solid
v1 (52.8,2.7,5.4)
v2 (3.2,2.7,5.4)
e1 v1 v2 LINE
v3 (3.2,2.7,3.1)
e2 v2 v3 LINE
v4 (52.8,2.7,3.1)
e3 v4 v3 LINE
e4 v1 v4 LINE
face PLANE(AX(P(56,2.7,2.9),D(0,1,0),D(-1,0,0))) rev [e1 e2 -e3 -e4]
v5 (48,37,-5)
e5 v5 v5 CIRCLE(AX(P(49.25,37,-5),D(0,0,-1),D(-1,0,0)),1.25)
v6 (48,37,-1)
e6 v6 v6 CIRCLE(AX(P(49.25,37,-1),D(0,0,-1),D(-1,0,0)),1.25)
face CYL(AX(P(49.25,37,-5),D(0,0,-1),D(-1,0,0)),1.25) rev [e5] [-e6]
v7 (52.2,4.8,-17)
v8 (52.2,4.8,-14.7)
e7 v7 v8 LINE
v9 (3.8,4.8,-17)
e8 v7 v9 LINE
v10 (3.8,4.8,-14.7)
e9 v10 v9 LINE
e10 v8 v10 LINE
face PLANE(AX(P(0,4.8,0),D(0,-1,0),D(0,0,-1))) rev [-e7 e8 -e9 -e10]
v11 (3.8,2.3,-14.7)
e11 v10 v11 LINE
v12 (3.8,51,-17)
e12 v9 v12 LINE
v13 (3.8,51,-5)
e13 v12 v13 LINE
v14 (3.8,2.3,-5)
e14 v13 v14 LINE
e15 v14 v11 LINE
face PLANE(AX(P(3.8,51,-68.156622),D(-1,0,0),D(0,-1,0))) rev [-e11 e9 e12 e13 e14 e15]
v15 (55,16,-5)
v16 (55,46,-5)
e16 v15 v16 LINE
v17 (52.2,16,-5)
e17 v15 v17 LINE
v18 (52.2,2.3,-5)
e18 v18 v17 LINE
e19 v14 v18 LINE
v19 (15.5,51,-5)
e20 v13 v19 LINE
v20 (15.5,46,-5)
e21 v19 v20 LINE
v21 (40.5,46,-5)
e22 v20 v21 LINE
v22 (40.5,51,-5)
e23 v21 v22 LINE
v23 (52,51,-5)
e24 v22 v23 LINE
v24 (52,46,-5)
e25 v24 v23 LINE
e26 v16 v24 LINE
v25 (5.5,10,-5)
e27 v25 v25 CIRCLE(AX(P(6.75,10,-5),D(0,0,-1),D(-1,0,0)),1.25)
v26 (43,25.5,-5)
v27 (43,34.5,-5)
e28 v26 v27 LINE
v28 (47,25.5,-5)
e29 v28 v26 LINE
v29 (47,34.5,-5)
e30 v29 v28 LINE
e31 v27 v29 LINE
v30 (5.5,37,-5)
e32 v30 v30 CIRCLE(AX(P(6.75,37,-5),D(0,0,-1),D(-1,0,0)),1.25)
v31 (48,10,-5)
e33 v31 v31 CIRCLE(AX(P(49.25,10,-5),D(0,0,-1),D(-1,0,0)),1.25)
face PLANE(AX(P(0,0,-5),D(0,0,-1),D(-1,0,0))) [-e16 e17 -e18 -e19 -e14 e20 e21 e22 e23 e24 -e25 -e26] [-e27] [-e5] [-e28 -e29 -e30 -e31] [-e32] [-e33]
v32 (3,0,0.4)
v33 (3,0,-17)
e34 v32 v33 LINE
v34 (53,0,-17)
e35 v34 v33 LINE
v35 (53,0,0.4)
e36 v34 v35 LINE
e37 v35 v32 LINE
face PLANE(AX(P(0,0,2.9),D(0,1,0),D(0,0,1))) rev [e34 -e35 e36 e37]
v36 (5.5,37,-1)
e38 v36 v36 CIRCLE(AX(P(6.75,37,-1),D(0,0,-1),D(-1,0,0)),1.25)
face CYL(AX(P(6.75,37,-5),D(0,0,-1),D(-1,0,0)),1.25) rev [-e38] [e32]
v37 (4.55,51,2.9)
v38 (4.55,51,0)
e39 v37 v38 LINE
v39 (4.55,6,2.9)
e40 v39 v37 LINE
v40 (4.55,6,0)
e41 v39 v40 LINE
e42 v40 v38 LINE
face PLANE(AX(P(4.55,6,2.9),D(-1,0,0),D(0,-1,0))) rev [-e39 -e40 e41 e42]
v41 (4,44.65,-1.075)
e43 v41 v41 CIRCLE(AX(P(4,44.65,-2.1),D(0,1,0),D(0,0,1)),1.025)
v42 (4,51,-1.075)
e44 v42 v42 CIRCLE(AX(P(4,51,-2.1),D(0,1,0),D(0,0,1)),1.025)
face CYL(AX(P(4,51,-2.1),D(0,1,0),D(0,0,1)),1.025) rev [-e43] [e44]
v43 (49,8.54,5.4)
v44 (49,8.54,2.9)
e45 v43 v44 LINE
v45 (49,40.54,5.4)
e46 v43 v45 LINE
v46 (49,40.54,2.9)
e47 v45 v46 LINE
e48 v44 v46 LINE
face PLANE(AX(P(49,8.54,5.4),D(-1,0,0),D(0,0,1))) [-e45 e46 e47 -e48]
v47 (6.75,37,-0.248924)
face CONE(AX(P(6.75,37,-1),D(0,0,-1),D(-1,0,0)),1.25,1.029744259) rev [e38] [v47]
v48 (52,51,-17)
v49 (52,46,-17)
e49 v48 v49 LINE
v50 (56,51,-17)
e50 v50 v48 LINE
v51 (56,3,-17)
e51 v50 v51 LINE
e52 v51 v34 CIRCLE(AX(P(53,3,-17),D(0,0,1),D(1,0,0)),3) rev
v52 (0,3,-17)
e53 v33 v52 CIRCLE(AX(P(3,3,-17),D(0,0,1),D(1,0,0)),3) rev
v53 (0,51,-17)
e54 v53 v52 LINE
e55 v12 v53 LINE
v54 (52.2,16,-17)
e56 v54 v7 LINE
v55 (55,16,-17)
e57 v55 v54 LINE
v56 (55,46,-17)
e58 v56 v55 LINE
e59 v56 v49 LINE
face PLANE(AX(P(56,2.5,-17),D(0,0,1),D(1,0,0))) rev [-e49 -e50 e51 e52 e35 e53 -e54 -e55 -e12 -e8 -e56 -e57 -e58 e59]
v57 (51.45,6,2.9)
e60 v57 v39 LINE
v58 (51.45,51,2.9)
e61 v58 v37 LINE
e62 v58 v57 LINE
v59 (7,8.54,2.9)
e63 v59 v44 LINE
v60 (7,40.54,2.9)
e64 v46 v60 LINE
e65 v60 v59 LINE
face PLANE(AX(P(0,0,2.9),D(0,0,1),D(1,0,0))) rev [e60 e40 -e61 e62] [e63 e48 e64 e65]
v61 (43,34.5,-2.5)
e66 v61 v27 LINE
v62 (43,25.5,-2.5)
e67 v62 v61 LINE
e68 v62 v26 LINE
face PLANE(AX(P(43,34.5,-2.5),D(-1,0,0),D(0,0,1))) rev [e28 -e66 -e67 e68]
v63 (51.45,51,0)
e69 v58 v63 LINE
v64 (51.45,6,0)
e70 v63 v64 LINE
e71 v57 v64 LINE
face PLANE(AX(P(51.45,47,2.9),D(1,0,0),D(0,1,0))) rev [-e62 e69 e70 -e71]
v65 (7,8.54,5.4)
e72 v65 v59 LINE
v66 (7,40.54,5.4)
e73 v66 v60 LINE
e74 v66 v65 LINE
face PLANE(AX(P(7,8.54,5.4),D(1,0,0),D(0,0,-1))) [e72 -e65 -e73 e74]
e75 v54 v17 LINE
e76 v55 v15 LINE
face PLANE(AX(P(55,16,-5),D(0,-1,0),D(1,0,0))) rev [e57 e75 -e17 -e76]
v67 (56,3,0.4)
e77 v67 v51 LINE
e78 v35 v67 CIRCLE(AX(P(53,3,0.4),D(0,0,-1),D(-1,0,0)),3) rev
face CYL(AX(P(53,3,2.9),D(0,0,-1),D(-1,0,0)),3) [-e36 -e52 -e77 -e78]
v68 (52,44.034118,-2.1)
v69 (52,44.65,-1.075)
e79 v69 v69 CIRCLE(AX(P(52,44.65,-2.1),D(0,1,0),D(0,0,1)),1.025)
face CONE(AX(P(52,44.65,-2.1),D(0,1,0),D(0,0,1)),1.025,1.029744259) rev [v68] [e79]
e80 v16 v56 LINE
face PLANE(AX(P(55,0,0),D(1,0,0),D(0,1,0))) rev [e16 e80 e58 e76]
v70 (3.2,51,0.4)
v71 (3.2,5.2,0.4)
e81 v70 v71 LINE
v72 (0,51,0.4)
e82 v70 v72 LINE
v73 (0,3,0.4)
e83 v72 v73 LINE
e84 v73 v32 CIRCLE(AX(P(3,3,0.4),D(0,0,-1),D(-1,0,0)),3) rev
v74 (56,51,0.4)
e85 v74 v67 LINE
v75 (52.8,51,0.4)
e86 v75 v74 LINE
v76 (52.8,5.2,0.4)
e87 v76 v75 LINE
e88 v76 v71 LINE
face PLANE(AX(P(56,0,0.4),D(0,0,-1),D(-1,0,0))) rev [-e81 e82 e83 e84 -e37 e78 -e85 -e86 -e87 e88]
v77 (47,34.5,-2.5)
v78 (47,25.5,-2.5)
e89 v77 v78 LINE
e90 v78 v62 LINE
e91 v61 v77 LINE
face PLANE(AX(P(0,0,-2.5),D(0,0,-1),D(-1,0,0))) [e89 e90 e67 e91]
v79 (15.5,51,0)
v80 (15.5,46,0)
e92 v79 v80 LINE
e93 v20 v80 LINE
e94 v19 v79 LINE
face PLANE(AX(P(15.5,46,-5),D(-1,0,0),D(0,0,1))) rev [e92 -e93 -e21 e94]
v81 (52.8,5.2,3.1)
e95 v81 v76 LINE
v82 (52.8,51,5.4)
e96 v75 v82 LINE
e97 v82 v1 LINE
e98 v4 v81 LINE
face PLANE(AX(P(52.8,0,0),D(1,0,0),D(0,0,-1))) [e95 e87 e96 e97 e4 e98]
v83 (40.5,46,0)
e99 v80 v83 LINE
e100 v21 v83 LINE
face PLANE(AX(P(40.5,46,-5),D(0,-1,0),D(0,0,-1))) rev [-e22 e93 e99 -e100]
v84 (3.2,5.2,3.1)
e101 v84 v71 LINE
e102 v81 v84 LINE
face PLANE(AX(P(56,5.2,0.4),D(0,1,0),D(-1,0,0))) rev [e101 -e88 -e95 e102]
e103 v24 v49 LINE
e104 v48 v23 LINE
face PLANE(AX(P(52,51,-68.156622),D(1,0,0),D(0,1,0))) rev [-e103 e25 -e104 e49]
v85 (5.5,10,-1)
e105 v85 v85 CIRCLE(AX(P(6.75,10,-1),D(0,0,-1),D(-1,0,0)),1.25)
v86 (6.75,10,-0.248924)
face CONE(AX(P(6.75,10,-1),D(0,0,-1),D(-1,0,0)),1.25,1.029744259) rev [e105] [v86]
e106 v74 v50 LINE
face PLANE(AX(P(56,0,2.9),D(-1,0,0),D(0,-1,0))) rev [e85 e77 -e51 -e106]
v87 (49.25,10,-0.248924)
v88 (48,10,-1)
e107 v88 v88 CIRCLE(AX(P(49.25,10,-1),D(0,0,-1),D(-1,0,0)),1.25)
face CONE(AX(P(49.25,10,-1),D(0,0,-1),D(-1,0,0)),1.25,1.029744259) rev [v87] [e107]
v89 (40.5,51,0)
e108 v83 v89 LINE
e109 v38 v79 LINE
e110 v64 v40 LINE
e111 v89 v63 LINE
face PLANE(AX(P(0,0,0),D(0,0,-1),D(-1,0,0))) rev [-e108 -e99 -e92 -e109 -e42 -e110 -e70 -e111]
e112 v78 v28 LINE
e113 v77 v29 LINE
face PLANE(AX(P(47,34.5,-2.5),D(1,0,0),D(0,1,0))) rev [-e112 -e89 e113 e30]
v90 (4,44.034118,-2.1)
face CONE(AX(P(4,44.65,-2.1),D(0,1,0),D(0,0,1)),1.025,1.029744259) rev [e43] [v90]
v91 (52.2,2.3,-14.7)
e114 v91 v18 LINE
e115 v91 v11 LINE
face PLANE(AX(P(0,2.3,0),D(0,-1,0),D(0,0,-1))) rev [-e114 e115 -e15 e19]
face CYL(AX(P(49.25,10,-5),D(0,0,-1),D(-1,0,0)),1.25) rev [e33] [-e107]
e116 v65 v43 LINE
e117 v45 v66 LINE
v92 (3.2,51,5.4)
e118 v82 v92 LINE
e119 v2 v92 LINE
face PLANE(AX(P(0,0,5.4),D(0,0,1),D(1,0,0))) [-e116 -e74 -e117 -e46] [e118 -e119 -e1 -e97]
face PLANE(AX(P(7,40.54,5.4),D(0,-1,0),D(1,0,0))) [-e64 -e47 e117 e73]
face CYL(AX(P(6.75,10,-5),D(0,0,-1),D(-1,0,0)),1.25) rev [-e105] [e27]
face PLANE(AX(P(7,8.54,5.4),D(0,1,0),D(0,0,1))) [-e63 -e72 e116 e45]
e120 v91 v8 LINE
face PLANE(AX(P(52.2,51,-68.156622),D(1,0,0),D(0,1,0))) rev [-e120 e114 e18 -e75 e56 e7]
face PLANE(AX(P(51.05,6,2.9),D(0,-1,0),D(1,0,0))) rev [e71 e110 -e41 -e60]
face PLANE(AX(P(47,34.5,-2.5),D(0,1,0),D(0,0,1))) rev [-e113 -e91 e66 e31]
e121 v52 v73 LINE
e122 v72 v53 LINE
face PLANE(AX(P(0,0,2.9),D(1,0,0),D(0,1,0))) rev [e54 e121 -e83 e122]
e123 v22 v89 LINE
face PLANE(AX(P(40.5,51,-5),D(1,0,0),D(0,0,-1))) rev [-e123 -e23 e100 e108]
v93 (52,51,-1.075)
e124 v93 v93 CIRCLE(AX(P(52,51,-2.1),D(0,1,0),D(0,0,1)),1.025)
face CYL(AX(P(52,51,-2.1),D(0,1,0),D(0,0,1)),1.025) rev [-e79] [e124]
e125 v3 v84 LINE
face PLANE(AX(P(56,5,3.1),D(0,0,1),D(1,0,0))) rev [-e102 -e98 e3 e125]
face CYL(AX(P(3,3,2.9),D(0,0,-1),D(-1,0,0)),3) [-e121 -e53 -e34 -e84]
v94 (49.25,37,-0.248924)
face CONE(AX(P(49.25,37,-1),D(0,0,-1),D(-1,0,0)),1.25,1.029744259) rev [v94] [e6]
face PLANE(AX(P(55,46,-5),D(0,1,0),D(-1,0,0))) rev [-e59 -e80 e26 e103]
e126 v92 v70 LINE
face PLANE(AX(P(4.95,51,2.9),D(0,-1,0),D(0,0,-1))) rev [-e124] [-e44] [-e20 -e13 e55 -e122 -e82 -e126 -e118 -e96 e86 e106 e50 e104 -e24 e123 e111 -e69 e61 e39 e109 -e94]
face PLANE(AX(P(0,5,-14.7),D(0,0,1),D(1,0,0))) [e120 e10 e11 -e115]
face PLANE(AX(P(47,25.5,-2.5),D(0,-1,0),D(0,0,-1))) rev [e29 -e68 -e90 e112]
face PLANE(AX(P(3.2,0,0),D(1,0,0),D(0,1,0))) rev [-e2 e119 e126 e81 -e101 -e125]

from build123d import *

# Parameters (mm, degrees)
BOSS_EXTRUDE1_OUTLINE_W      = 4.95
BOSS_EXTRUDE1_OUTLINE_H      = 2.9
BOSS_EXTRUDE1_DEPTH          = 51
BOSS_EXTRUDE1_2_OUTLINE_W    = 46.1
BOSS_EXTRUDE1_2_OUTLINE_H    = 2.9
BOSS_EXTRUDE1_2_DEPTH        = 6
SKETCH2_W                    = 56
SKETCH2_H                    = 51
SKETCH2_W_2                  = 42
SKETCH2_H_2                  = 32
BOSS_EXTRUDE2_DEPTH          = 2.5
BOSS_EXTRUDE3_DEPTH          = 5
M3X0_5_TAPPED_HOLE1_D        = 2.5
M3X0_5_TAPPED_HOLE1_DEPTH    = 4
M3X0_5_TAPPED_HOLE1_TIP      = 0.751075774
SKETCH9_W                    = 56
SKETCH9_H                    = 2.5
BOSS_EXTRUDE4_DEPTH          = 5
SKETCH9_3_W                  = 56
SKETCH9_3_H                  = 9.5
BOSS_EXTRUDE5_DEPTH          = 2.5
M2_5X0_45_TAPPED_HOLE1_D     = 2.05
M2_5X0_45_TAPPED_HOLE1_DEPTH = 6.35
M2_5X0_45_TAPPED_HOLE1_TIP   = 0.615882135
BOSS_EXTRUDE6_REACH          = 78.688
SKETCH12_W                   = 4
SKETCH12_H                   = 51
SKETCH13_W                   = 4
SKETCH13_H                   = 9
CUT_EXTRUDE1_DEPTH           = 2.5
SKETCH14_W                   = 12
SKETCH14_H                   = 30
CUT_EXTRUDE2_DEPTH           = 3
CUT_EXTRUDE3_DEPTH           = 78.62731478
SKETCH17_W                   = 5
SKETCH17_H                   = 51
CUT_EXTRUDE4_DEPTH           = 3
SKETCH18_W                   = 5
SKETCH18_H                   = 51
CUT_EXTRUDE5_DEPTH           = 3
FILLET1_R                    = 3
MOVE_FACE1_BY                = 0.2
MOVE_FACE1_2_BY              = 0.2
MOVE_FACE1_3_BY              = 0.2
MOVE_FACE1_4_BY              = 0.2
MOVE_FACE1_5_BY              = 0.2
MOVE_FACE1_6_BY              = 0.2
MOVE_FACE1_7_BY              = 0.2
MOVE_FACE1_8_BY              = 0.2
MOVE_FACE1_9_BY              = 0.2
MOVE_FACE1_10_BY             = 0.2
MOVE_START                   = 4.55
MOVE_FACE2_OUTLINE_W         = 45
MOVE_FACE2_OUTLINE_H         = 2.9
MOVE_FACE2_DEPTH             = 46.9


# Read off the part's stored shape, not the designer's step: Boss-Extrude1, Move Face2
with BuildPart() as part:
    # Boss-Extrude1 outline → Boss-Extrude1 (new body)
    with BuildSketch(Plane(origin=(0, 0, 0), x_dir=(1, 0, 0), z_dir=(0, 1, 0))):
        with Locations((2.475, -1.45)):
            Rectangle(BOSS_EXTRUDE1_OUTLINE_W, BOSS_EXTRUDE1_OUTLINE_H)
        with Locations((53.525, -1.45)):
            Rectangle(BOSS_EXTRUDE1_OUTLINE_W, BOSS_EXTRUDE1_OUTLINE_H)
    extrude(amount=BOSS_EXTRUDE1_DEPTH)

    # Boss-Extrude1 2 outline → Boss-Extrude1 2 (add)
    with BuildSketch(Plane(origin=(0, 0, 0), x_dir=(1, 0, 0), z_dir=(0, 1, 0))):
        with Locations((28, -1.45)):
            Rectangle(BOSS_EXTRUDE1_2_OUTLINE_W, BOSS_EXTRUDE1_2_OUTLINE_H)
    extrude(amount=BOSS_EXTRUDE1_2_DEPTH)

    # Sketch2 → Boss-Extrude2 (add)
    with BuildSketch(Plane.XY.offset(2.9)):
        with Locations((28, 25.5)):
            Rectangle(SKETCH2_W, SKETCH2_H)
        with Locations((28, 24.54)):
            Rectangle(SKETCH2_W_2, SKETCH2_H_2, mode=Mode.SUBTRACT)
    extrude(amount=BOSS_EXTRUDE2_DEPTH)

    # Sketch3 → Boss-Extrude3 (add)
    with BuildSketch(Plane(origin=(0, 0, 0), x_dir=(-1, 0, 0), z_dir=(0, 0, -1))):
        Polygon((-56, 51), (-40.5, 51), (-40.5, 46), (-15.5, 46), (-15.5, 51), (0, 51), (0, 0), (-56, 0), align=None)
    extrude(amount=BOSS_EXTRUDE3_DEPTH)

    # M3x0.5 Tapped Hole1
    with Locations(Plane(origin=(0, 0, -5), x_dir=(-1, 0, 0), z_dir=(0, 0, -1))):
        with Locations((-49.25, 37), (-6.75, 37), (-6.75, 10), (-49.25, 10)):
            Hole(M3X0_5_TAPPED_HOLE1_D / 2, depth=M3X0_5_TAPPED_HOLE1_DEPTH)
            with Locations((0, 0, -(M3X0_5_TAPPED_HOLE1_DEPTH + M3X0_5_TAPPED_HOLE1_TIP / 2))):  # 118° drill point
                Cone(0, M3X0_5_TAPPED_HOLE1_D / 2, M3X0_5_TAPPED_HOLE1_TIP, mode=Mode.SUBTRACT)



with BuildPart() as body_2:
    # Sketch9 → Boss-Extrude4 (new body)
    with BuildSketch(Plane.XZ):
        with Locations((28, -15.75)):
            Rectangle(SKETCH9_W, SKETCH9_H)
    extrude(amount=-BOSS_EXTRUDE4_DEPTH)


with BuildPart() as part_1:
    add(part.part)

    add(body_2.part)  # Boss-Extrude5 merges body 2
    # Sketch9<3> → Boss-Extrude5 (add)
    with BuildSketch(Plane.XZ):
        with Locations((28, -9.75)):
            Rectangle(SKETCH9_3_W, SKETCH9_3_H)
    extrude(amount=-BOSS_EXTRUDE5_DEPTH)

    # M2.5x0.45 Tapped Hole1
    with Locations(Plane(origin=(0, 51, 0), x_dir=(1, 0, 0), z_dir=(0, 1, 0))):
        with Locations((4, 2.1), (52, 2.1)):
            Hole(M2_5X0_45_TAPPED_HOLE1_D / 2, depth=M2_5X0_45_TAPPED_HOLE1_DEPTH)
            with Locations((0, 0, -(M2_5X0_45_TAPPED_HOLE1_DEPTH + M2_5X0_45_TAPPED_HOLE1_TIP / 2))):  # 118° drill point
                Cone(0, M2_5X0_45_TAPPED_HOLE1_D / 2, M2_5X0_45_TAPPED_HOLE1_TIP, mode=Mode.SUBTRACT)

    # Boss-Extrude6: up to this face of the body (flat: up to its plane)
    boss_extrude6_end = Plane(part_1.part.faces().sort_by_distance((28, 2.5, -17))[0])
    # Sketch12 → Boss-Extrude6 (add, up to the picked face)
    with BuildSketch(Plane(origin=(0, 0, -5), x_dir=(-1, 0, 0), z_dir=(0, 0, -1)), mode=Mode.PRIVATE) as boss_extrude6_sk1:
        with Locations((-2, 25.5)):
            Rectangle(SKETCH12_W, SKETCH12_H)
    boss_extrude6_tool1 = split(extrude(boss_extrude6_sk1.sketch, amount=BOSS_EXTRUDE6_REACH, mode=Mode.PRIVATE), bisect_by=boss_extrude6_end, keep=Keep.BOTH, mode=Mode.PRIVATE)
    # Sketch12 → Boss-Extrude6 (add, up to the picked face)
    with BuildSketch(Plane(origin=(0, 0, -5), x_dir=(-1, 0, 0), z_dir=(0, 0, -1)), mode=Mode.PRIVATE) as boss_extrude6_sk2:
        with Locations((-54, 25.5)):
            Rectangle(SKETCH12_W, SKETCH12_H)
    boss_extrude6_tool2 = split(extrude(boss_extrude6_sk2.sketch, amount=BOSS_EXTRUDE6_REACH, mode=Mode.PRIVATE), bisect_by=boss_extrude6_end, keep=Keep.BOTH, mode=Mode.PRIVATE)
    add(boss_extrude6_tool1.solids().sort_by(Axis((2, 25.5, -5), (0, 0, -1)))[0])
    add(boss_extrude6_tool2.solids().sort_by(Axis((54, 25.5, -5), (0, 0, -1)))[0])

    # Sketch13 → Cut-Extrude1 (cut)
    with BuildSketch(Plane(origin=(0, 0, -5), x_dir=(-1, 0, 0), z_dir=(0, 0, -1))):
        with Locations((-45, 30)):
            Rectangle(SKETCH13_W, SKETCH13_H)
    extrude(amount=-CUT_EXTRUDE1_DEPTH, mode=Mode.SUBTRACT)

    # Sketch14 → Cut-Extrude2 (cut)
    with BuildSketch(Plane.ZY.offset(-52)):
        with Locations((-11, 31)):
            Rectangle(SKETCH14_W, SKETCH14_H)
    extrude(amount=-CUT_EXTRUDE2_DEPTH, mode=Mode.SUBTRACT)

    # Sketch15 → Cut-Extrude3 (cut, through all)
    with BuildSketch(Plane.ZY):
        Polygon((5.4, 0), (0.4, 0), (0.4, 5), (2.9, 5), (2.9, 2.5), (5.4, 2.5), align=None)
    extrude(amount=-CUT_EXTRUDE3_DEPTH, mode=Mode.SUBTRACT)

    # Sketch17 → Cut-Extrude4 (cut)
    with BuildSketch(Plane.ZY):
        with Locations((2.9, 25.5)):
            Rectangle(SKETCH17_W, SKETCH17_H)
    extrude(amount=-CUT_EXTRUDE4_DEPTH, mode=Mode.SUBTRACT)

    # Sketch18 → Cut-Extrude5 (cut)
    with BuildSketch(Plane(origin=(56, 0, 0), x_dir=(0, 0, -1), z_dir=(1, 0, 0))):
        with Locations((-2.9, 25.5)):
            Rectangle(SKETCH18_W, SKETCH18_H)
    extrude(amount=-CUT_EXTRUDE5_DEPTH, mode=Mode.SUBTRACT)

    # Fillet1
    fillet1_edges = [part_1.edges().sort_by_distance(p)[0] for p in [
        (56, 0, -8.3),
        (0, 0, -8.3),
    ]]
    fillet(fillet1_edges, radius=FILLET1_R)

    # Move Face1: a face moved inward by 0.2
    extrude(part_1.faces().sort_by_distance((28, 3.75, 2.9))[0], amount=MOVE_FACE1_BY, dir=(0, 0, 1), mode=Mode.SUBTRACT)

    # Move Face1 2: a face moved inward by 0.2
    extrude(part_1.faces().sort_by_distance((28, 2.5, 4.15))[0], amount=MOVE_FACE1_2_BY, dir=(0, 1, 0), mode=Mode.SUBTRACT)

    # Move Face1 3: a face moved inward by 0.2
    extrude(part_1.faces().sort_by_distance((28, 5, 1.65))[0], amount=MOVE_FACE1_3_BY, dir=(0, 1, 0), mode=Mode.SUBTRACT)

    # Move Face1 4: a face moved inward by 0.2
    extrude(part_1.faces().sort_by_distance((3, 27.358465608, 2.933068783))[0], amount=MOVE_FACE1_4_BY, dir=(1, 0, 0), mode=Mode.SUBTRACT)

    # Move Face1 5: a face moved inward by 0.2
    extrude(part_1.faces().sort_by_distance((53, 27.358465608, 2.933068783))[0], amount=MOVE_FACE1_5_BY, dir=(-1, 0, 0), mode=Mode.SUBTRACT)

    # Move Face1 6: a face moved inward by 0.2
    extrude(part_1.faces().sort_by_distance((28, 2.5, -9.75))[0], amount=MOVE_FACE1_6_BY, dir=(0, -1, 0), mode=Mode.SUBTRACT)

    # Move Face1 7: a face moved inward by 0.2
    extrude(part_1.faces().sort_by_distance((28, 3.75, -14.5))[0], amount=MOVE_FACE1_7_BY, dir=(0, 0, -1), mode=Mode.SUBTRACT)

    # Move Face1 8: a face moved inward by 0.2
    extrude(part_1.faces().sort_by_distance((28, 5, -15.75))[0], amount=MOVE_FACE1_8_BY, dir=(0, -1, 0), mode=Mode.SUBTRACT)

    # Move Face1 9: a face moved inward by 0.2
    extrude(part_1.faces().sort_by_distance((4, 26.999674338, -10.948436822))[0], amount=MOVE_FACE1_9_BY, dir=(-1, 0, 0), mode=Mode.SUBTRACT)

    # Move Face1 10: a face moved inward by 0.2
    extrude(part_1.faces().sort_by_distance((52, 9.47070626, -10.809390048))[0], amount=MOVE_FACE1_10_BY, dir=(1, 0, 0), mode=Mode.SUBTRACT)

    # Move Face2 outline → Move Face2 (cut)
    with BuildSketch(Plane.YZ.offset(MOVE_START)):
        with Locations((28.5, 1.45)):
            Rectangle(MOVE_FACE2_OUTLINE_W, MOVE_FACE2_OUTLINE_H)
    extrude(amount=MOVE_FACE2_DEPTH, mode=Mode.SUBTRACT)


solid = part_1.part
